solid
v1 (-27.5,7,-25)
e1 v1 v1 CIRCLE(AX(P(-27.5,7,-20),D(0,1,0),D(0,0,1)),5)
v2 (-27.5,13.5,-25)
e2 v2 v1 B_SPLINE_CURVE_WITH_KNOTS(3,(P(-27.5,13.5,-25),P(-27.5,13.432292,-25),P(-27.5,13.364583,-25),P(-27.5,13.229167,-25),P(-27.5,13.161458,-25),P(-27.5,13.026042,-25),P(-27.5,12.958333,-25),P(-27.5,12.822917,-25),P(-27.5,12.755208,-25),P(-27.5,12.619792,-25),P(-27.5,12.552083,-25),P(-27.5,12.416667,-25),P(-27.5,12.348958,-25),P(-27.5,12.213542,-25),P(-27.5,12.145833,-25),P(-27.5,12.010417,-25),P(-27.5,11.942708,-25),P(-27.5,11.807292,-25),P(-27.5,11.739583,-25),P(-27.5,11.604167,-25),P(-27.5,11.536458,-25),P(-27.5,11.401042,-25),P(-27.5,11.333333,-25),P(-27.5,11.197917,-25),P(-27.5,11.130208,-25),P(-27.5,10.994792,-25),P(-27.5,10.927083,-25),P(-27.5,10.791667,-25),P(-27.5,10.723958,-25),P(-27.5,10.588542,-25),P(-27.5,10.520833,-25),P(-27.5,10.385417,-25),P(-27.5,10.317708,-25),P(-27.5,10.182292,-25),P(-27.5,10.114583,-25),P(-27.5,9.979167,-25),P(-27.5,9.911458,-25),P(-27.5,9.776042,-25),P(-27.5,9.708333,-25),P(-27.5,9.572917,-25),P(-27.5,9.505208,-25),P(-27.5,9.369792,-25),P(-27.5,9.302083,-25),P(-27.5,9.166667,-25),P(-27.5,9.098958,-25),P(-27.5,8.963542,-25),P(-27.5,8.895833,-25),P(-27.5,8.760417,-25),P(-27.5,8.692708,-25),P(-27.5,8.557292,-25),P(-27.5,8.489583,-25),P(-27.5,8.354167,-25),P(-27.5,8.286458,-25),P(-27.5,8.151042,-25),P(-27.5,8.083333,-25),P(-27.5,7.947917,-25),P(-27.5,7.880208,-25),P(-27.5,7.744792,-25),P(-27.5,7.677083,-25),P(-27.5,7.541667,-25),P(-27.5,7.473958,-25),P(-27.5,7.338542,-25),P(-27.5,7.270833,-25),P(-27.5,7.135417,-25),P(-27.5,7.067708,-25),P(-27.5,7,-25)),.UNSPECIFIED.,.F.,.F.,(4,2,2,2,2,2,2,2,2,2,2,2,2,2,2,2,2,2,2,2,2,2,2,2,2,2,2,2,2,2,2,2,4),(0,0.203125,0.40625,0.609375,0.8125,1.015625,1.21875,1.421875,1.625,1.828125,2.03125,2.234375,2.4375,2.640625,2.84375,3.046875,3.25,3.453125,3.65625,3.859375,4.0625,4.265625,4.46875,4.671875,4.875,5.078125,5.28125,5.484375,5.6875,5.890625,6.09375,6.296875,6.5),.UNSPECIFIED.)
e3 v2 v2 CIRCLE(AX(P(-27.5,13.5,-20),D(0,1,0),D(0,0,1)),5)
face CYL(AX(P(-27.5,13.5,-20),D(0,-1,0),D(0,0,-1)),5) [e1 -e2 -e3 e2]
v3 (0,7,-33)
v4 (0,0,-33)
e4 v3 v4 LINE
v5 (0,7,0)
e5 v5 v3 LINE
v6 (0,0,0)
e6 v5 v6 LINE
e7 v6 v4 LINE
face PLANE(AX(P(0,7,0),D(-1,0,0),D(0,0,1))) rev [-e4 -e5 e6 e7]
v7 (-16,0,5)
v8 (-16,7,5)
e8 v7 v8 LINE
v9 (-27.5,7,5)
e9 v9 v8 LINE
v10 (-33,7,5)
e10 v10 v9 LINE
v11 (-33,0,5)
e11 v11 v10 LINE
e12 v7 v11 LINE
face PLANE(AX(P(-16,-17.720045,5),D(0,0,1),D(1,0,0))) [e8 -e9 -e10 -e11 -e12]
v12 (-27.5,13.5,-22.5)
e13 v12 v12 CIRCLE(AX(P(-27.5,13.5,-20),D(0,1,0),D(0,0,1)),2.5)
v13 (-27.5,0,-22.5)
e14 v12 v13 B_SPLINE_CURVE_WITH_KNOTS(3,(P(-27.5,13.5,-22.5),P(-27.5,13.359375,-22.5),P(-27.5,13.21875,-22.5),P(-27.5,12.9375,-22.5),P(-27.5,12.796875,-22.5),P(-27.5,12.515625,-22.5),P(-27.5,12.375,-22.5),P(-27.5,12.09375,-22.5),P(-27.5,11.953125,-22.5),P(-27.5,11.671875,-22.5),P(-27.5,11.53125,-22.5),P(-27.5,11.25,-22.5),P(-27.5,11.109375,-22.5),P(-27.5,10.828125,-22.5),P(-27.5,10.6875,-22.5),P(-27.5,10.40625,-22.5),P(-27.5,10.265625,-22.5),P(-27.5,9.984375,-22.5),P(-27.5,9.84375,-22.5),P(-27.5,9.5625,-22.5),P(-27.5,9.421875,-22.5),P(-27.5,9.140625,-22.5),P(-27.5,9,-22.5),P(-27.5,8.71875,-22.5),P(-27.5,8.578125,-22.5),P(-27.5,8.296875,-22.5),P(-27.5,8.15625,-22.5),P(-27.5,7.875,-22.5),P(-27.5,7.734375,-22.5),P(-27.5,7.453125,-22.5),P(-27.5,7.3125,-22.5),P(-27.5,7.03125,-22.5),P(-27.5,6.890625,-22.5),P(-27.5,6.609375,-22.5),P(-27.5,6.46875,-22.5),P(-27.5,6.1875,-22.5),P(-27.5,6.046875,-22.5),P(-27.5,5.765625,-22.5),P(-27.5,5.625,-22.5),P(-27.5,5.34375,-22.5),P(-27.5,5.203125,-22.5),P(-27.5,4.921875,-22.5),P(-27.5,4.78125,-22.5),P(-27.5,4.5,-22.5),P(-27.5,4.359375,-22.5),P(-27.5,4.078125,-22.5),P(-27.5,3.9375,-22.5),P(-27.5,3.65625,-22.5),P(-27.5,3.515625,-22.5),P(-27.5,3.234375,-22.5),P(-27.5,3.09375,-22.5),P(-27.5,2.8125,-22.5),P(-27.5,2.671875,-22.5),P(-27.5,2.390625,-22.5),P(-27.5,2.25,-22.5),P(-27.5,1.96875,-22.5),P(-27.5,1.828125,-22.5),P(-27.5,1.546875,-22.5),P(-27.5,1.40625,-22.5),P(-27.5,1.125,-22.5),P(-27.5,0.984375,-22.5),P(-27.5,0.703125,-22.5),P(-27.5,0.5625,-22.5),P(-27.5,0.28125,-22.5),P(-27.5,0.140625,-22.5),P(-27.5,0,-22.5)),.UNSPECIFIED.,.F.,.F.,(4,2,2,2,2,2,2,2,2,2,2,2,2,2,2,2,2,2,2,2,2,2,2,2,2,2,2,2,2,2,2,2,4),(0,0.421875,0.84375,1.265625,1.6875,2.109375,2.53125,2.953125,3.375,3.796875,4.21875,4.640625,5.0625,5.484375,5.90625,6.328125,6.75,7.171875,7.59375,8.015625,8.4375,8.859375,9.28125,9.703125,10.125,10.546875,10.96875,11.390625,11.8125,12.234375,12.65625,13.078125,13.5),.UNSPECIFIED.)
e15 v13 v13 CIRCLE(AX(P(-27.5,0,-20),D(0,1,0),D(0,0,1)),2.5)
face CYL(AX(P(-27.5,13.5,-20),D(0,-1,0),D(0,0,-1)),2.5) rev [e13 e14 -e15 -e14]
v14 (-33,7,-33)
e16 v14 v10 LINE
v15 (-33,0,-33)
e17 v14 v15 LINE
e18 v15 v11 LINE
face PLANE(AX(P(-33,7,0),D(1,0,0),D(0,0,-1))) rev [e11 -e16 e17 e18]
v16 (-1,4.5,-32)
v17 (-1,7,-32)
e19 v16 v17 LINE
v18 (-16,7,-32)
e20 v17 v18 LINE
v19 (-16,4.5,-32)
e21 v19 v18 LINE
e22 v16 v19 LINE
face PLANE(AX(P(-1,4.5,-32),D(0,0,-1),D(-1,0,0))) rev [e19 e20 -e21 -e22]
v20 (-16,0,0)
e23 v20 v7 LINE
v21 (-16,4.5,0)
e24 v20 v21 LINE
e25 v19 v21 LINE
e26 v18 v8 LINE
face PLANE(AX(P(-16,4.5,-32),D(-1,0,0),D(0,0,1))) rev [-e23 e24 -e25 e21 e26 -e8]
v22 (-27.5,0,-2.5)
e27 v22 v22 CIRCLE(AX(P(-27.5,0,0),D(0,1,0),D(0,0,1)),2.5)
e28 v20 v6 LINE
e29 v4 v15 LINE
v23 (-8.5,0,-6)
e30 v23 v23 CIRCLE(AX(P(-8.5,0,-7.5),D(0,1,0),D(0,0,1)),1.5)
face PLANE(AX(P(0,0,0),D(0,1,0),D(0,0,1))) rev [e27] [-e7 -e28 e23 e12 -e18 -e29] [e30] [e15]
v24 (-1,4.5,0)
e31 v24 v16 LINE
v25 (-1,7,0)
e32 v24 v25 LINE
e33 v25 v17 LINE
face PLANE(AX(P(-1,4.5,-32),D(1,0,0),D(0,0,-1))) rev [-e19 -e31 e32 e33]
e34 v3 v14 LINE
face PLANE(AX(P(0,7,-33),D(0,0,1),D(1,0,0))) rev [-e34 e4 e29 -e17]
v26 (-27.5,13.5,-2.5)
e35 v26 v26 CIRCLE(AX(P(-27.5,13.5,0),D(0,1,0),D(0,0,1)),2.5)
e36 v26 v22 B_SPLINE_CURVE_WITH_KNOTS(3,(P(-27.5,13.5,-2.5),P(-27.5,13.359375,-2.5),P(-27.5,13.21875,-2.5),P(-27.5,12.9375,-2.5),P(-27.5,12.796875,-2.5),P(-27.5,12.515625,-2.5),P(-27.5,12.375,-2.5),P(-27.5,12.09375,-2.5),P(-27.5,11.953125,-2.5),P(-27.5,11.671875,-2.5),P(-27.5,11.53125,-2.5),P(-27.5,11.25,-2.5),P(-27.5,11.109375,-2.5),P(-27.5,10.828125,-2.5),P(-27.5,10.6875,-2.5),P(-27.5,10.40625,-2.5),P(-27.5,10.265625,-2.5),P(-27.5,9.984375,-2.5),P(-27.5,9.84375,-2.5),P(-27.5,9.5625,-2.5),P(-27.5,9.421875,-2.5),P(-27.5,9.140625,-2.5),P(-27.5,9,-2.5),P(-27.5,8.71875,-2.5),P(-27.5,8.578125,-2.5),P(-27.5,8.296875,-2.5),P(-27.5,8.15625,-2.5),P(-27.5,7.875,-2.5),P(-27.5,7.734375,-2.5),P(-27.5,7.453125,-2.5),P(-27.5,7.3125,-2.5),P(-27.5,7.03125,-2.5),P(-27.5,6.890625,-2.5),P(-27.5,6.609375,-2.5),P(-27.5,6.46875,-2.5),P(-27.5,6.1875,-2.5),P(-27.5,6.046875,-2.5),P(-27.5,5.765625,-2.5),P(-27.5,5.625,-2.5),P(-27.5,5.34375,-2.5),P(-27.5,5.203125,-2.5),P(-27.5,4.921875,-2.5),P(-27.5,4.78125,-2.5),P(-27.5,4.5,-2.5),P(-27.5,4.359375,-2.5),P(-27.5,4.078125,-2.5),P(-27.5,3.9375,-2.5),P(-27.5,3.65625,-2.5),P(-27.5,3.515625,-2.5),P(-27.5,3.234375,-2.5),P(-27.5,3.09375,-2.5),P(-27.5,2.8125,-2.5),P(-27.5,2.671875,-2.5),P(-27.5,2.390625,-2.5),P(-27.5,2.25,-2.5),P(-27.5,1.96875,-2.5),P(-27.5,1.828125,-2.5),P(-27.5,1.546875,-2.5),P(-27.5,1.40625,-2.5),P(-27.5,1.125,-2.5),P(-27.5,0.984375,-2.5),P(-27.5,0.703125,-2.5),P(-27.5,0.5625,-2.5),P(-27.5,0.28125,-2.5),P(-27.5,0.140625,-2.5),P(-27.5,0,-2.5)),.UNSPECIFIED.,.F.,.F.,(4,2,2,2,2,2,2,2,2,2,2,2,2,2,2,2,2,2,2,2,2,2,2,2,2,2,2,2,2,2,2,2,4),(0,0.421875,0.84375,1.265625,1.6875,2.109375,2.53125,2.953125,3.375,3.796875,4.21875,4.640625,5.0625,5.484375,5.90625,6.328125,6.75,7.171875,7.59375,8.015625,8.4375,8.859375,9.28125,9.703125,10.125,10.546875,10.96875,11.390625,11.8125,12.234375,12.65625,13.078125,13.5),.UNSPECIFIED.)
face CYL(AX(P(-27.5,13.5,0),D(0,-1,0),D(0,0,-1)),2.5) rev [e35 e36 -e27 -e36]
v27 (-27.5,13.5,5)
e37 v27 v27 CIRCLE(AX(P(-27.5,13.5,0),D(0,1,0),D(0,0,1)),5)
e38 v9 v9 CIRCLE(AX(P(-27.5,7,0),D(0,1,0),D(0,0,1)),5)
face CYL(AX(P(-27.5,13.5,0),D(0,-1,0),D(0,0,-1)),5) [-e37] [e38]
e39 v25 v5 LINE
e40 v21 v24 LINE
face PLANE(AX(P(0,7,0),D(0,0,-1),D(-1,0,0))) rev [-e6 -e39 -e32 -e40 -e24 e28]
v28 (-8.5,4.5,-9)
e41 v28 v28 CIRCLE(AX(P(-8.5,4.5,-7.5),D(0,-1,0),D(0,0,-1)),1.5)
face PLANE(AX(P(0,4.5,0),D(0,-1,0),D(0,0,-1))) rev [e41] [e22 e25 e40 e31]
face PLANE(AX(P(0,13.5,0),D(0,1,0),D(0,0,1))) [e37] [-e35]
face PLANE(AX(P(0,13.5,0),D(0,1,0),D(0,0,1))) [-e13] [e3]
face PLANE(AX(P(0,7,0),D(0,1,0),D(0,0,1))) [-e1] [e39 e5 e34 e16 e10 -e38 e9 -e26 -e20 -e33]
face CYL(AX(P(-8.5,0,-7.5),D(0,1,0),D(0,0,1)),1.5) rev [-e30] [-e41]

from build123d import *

# Parameters (mm, degrees)
SKETCH1_W                = 33
SKETCH1_H                = 33
BOSS_EXTRUDE1_DEPTH      = 7
SKETCH2_W                = 15
SKETCH2_H                = 32
CUT_EXTRUDE1_DEPTH       = 2.5
SKETCH4_W                = 17
SKETCH4_H                = 5
BOSS_EXTRUDE3_DEPTH      = 7
SKETCH3_R                = 5
SKETCH3_R_2              = 2.5
BOSS_EXTRUDE4_DEPTH      = 6.5
CUT_EXTRUDE4_START       = -7
CUT_EXTRUDE4_OUTLINE_R   = 2.5
CUT_EXTRUDE4_OUTLINE_R_2 = 1.5
CUT_EXTRUDE4_DEPTH       = 7


# Read off the part's stored shape, not the designer's step: Cut-Extrude4
with BuildPart() as part:
    # Sketch1 → Boss-Extrude1 (new body)
    with BuildSketch(Plane(origin=(0, 0, 0), x_dir=(1, 0, 0), z_dir=(0, 1, 0))):
        with Locations((-16.5, 16.5)):
            Rectangle(SKETCH1_W, SKETCH1_H)
    extrude(amount=BOSS_EXTRUDE1_DEPTH)

    # Sketch2 → Cut-Extrude1 (cut)
    with BuildSketch(Plane(origin=(0, 7, 0), x_dir=(1, 0, 0), z_dir=(0, 1, 0))):
        with Locations((-8.5, 16)):
            Rectangle(SKETCH2_W, SKETCH2_H)
    extrude(amount=-CUT_EXTRUDE1_DEPTH, mode=Mode.SUBTRACT)

    # Sketch4 → Boss-Extrude3 (add)
    with BuildSketch(Plane(origin=(0, 7, 0), x_dir=(1, 0, 0), z_dir=(0, 1, 0))):
        with Locations((-24.5, -2.5)):
            Rectangle(SKETCH4_W, SKETCH4_H)
    extrude(amount=-BOSS_EXTRUDE3_DEPTH)

    # Sketch3 → Boss-Extrude4 (add)
    # profile 1 of 2: a face of its own
    with BuildSketch(Plane(origin=(0, 7, 0), x_dir=(1, 0, 0), z_dir=(0, 1, 0))):
        with Locations(Location((-27.5, 20, 0), (0, 0, 90))):
            Circle(SKETCH3_R)
        with Locations(Location((-27.5, 20, 0), (0, 0, 90))):
            Circle(SKETCH3_R_2, mode=Mode.SUBTRACT)
    # profile 2 of 2: a face of its own
    with BuildSketch(Plane(origin=(0, 7, 0), x_dir=(1, 0, 0), z_dir=(0, 1, 0))):
        with Locations(Location((-27.5, 0, 0), (0, 0, 270))):
            Circle(SKETCH3_R)
        with Locations(Location((-27.5, 0, 0), (0, 0, 90))):
            Circle(SKETCH3_R_2, mode=Mode.SUBTRACT)
    extrude(amount=BOSS_EXTRUDE4_DEPTH)

    # Cut-Extrude4 outline → Cut-Extrude4 (cut)
    with BuildSketch(Plane(origin=(0, 7, 0), x_dir=(1, 0, 0), z_dir=(0, 1, 0)).offset(CUT_EXTRUDE4_START)):
        with Locations((-27.5, 20)):
            Circle(CUT_EXTRUDE4_OUTLINE_R)
        with Locations((-27.5, 0)):
            Circle(CUT_EXTRUDE4_OUTLINE_R)
        with Locations((-8.5, 7.5)):
            Circle(CUT_EXTRUDE4_OUTLINE_R_2)
    extrude(amount=CUT_EXTRUDE4_DEPTH, mode=Mode.SUBTRACT)


solid = part.part
